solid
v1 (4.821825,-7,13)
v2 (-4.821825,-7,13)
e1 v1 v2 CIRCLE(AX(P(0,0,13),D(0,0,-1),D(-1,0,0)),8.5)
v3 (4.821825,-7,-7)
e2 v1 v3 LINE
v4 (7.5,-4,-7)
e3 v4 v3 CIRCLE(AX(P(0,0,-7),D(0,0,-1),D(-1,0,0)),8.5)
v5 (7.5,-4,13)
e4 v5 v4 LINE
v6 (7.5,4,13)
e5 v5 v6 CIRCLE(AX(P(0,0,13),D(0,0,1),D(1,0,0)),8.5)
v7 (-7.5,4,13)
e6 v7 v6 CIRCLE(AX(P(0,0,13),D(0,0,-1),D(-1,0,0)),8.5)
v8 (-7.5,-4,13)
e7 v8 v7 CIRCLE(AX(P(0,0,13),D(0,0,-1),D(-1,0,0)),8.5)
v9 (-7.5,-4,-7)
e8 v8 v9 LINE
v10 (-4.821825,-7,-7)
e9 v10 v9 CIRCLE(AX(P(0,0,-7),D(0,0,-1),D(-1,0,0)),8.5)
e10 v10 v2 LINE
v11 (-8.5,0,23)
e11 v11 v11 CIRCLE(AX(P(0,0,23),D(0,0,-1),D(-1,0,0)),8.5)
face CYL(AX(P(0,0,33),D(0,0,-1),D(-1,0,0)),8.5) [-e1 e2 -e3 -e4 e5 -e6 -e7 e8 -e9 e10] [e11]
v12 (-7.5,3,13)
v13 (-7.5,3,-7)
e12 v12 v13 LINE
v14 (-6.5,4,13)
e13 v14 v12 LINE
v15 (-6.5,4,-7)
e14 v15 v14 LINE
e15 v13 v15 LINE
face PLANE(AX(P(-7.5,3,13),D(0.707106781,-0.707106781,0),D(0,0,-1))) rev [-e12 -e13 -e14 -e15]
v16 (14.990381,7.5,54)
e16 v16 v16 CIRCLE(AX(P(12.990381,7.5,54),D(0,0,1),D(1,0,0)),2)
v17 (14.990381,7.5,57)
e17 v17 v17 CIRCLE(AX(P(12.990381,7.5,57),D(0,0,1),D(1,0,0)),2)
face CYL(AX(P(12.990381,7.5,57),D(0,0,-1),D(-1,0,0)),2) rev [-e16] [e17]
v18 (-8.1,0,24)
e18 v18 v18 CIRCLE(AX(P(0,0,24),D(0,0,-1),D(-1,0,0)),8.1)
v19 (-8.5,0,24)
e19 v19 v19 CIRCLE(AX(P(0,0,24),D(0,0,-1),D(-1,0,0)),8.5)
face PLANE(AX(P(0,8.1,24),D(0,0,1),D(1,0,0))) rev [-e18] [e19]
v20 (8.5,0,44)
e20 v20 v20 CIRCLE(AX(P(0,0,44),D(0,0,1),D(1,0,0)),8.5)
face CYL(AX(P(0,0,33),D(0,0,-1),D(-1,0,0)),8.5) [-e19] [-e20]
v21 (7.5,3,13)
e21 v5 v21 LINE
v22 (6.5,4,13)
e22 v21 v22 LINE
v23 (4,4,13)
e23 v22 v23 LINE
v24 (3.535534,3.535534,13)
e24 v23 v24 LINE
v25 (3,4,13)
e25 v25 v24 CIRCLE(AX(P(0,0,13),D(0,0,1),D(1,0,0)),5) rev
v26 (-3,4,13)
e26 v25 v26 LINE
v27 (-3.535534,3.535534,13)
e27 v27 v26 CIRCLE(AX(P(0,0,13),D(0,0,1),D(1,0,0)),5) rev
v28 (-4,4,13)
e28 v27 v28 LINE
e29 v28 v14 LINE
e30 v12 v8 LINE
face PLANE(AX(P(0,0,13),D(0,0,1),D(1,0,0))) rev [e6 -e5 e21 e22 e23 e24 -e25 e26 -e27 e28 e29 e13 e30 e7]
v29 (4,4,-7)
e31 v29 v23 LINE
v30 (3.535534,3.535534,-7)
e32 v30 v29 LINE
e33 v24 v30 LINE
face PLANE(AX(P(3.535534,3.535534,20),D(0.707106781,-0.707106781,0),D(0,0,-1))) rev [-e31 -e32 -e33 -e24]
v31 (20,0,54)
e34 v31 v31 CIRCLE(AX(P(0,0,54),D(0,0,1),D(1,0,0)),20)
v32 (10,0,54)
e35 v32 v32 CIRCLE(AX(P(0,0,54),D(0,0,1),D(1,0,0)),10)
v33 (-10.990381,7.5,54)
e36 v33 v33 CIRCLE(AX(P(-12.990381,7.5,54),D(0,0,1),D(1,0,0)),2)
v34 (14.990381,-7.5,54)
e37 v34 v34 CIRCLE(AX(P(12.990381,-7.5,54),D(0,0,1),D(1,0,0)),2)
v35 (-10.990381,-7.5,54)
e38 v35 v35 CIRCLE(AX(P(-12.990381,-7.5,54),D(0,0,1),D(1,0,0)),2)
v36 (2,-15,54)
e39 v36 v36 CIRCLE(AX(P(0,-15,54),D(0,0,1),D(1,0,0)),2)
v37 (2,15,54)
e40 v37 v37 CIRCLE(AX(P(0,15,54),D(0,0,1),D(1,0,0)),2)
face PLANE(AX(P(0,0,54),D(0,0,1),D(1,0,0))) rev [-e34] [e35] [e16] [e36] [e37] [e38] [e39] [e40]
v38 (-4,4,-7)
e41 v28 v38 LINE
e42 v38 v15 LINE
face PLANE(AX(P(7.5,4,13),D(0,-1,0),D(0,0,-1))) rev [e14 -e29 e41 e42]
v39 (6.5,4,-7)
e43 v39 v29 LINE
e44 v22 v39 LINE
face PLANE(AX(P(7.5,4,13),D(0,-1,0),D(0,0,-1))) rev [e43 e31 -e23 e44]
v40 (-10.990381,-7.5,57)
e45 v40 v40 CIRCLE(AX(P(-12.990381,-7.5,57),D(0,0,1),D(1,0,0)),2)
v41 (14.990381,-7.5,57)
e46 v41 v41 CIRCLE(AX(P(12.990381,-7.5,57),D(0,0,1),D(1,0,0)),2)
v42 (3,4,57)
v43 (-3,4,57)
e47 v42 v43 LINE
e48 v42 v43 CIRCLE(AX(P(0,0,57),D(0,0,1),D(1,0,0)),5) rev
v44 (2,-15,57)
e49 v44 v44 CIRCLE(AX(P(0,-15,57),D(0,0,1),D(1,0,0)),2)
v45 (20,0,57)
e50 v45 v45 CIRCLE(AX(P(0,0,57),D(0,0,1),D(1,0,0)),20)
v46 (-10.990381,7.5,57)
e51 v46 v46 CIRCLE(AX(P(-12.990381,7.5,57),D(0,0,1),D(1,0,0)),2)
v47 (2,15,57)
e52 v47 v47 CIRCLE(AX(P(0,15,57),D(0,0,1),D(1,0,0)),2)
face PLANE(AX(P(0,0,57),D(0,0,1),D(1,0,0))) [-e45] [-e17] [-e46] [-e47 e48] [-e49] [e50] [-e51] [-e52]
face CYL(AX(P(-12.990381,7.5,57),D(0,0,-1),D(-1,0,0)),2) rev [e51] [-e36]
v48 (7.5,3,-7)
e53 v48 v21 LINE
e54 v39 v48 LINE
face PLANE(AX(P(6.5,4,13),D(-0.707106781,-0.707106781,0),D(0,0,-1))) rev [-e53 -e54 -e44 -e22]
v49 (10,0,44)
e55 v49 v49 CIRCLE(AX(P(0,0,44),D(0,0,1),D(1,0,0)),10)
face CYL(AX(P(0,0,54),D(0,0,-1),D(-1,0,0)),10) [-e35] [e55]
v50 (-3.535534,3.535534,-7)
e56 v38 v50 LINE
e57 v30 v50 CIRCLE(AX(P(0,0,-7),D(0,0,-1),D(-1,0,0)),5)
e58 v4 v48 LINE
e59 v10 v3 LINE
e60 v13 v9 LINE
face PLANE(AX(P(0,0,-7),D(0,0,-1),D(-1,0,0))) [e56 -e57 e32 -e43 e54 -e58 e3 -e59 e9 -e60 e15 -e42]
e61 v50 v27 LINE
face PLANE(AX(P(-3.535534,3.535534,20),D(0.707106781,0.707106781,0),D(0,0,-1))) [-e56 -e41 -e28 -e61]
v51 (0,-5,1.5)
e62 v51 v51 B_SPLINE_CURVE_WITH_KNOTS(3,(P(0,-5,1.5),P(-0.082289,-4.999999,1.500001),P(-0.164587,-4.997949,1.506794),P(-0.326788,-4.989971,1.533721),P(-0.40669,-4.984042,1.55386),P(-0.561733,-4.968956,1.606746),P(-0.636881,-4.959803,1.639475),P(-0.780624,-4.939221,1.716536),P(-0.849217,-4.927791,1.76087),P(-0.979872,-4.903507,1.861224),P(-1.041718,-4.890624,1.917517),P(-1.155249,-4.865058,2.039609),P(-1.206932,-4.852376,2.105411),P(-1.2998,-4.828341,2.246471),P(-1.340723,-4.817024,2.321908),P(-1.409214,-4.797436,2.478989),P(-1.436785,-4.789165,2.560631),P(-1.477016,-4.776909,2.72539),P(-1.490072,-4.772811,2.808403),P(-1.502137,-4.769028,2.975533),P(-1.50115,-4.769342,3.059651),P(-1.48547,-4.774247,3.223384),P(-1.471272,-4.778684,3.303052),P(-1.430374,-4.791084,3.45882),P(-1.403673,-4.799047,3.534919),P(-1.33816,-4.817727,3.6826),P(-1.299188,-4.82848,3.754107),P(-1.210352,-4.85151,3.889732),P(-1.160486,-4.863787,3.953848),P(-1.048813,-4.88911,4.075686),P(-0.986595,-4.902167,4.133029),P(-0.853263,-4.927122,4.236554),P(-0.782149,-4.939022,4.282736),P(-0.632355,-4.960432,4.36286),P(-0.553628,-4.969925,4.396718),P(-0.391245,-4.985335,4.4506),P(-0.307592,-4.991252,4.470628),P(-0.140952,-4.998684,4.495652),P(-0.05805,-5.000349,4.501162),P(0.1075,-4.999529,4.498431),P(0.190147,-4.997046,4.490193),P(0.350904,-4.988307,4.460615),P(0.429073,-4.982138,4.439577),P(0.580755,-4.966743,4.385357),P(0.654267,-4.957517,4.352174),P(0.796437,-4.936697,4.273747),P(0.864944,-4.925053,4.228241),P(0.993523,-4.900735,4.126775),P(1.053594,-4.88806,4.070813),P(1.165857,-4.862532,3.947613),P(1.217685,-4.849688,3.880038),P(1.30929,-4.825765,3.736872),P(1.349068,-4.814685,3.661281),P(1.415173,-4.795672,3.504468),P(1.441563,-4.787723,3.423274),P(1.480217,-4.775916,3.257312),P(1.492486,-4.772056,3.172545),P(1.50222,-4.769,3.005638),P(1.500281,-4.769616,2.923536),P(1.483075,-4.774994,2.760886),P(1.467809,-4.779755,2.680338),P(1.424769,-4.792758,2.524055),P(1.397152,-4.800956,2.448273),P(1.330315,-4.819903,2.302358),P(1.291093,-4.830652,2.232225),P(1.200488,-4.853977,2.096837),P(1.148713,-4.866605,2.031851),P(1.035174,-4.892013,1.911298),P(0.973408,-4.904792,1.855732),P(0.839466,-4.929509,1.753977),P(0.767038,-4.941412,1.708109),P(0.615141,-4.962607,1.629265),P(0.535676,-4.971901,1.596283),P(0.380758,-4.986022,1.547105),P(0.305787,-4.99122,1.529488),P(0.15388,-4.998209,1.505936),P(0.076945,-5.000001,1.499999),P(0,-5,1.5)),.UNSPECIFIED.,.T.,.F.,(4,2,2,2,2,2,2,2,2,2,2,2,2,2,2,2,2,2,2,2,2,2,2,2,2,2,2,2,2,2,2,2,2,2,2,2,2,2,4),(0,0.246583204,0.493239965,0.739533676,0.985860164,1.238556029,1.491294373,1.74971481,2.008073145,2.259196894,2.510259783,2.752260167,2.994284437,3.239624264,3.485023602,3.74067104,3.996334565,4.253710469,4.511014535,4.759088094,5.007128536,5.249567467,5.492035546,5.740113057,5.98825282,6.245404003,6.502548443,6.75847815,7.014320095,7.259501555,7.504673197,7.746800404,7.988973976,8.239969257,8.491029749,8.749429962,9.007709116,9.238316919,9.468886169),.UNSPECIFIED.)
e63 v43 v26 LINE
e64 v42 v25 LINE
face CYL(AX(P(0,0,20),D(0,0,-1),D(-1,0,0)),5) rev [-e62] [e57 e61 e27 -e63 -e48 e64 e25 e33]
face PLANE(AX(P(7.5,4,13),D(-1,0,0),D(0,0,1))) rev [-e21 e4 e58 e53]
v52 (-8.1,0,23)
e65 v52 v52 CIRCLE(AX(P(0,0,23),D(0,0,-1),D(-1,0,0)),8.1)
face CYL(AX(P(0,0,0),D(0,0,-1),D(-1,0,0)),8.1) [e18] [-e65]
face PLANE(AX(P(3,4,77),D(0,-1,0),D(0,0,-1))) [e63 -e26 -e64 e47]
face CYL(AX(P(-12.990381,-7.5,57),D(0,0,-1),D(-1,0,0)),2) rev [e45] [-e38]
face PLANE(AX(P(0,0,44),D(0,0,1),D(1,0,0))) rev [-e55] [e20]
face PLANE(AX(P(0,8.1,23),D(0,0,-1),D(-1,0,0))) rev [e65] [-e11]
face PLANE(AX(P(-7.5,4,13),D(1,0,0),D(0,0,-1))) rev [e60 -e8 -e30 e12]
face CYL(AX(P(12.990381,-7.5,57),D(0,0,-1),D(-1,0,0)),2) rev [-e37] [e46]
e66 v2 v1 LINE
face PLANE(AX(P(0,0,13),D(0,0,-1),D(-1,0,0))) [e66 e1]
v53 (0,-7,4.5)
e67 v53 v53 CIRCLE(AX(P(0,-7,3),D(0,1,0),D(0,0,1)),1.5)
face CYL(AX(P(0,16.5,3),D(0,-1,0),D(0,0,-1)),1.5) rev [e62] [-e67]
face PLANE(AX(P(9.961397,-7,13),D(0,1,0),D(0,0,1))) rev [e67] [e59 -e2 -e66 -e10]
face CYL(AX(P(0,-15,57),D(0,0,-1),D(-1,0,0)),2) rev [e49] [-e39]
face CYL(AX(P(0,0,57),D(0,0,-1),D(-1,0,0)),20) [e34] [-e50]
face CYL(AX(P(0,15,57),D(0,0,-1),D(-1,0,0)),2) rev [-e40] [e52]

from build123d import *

# Parameters (mm, degrees)
SKETCH_1_R               = 8.5
EXTRUDE_1_DEPTH          = 33
SKETCH_2_R               = 8.5
EXTRUDE_2_DEPTH          = 11
SKETCH_3_R               = 10
EXTRUDE_3_DEPTH          = 10
CHAMFER_2_SIZE           = 0.5
SKETCH_12_W              = 1
SKETCH_12_H              = 0.4
SKETCH_13_R              = 5
CUT_EXTRUDE_1_DEPTH      = 20
EXTRUDE_START            = 7.5
SKETCH_19_R              = 8.5
EXTRUDE_6_DEPTH          = 7.5
SKETCH_20_R              = 5
CUT_EXTRUDE_5_DEPTH      = 7.5
CUT_EXTRUDE_6_DEPTH      = 16.5
CUT_EXTRUDE_6_DEPTH_BACK = 16.5
SKETCH_21_R              = 1.5
SKETCH_14_R              = 20
SKETCH_14_R_2            = 2
EXTRUDE_7_DEPTH          = 3
EXTRUDE_START_2          = 7
SKETCH_23_R              = 5
EXTRUDE_8_DEPTH          = 7
CUT_EXTRUDE_START        = -44
SKETCH_24_R              = 5
CUT_EXTRUDE_7_DEPTH      = 44
SKETCH_31_R              = 7
SKETCH_31_R_2            = 5
EXTRUDE_10_DEPTH         = 20
EXTRUDE_11_DEPTH         = 84
SKETCH_33_R              = 1.5
CUT_EXTRUDE_8_DEPTH      = 26
EXTRUDE_START_3          = -3
SKETCH_35_R              = 13
SKETCH_35_R_2            = 7
EXTRUDE_12_DEPTH         = 3
SKETCH_36_R              = 1.5
CUT_EXTRUDE_10_DEPTH     = 3
CUT_EXTRUDE_START_2      = -20
SKETCH_38_R              = 20
CUT_EXTRUDE_12_DEPTH     = 20
SKETCH_39_W              = 15
SKETCH_39_H              = 6.010679791
CUT_EXTRUDE_13_DEPTH     = 20
SKETCH_40_W              = 3.690554248
SKETCH_40_H              = 8
SKETCH_40_W_2            = 3.213479815
CUT_EXTRUDE_14_DEPTH     = 20
SKETCH_42_W              = 19.43068456
SKETCH_42_H              = 3.441553847
CUT_EXTRUDE_16_DEPTH     = 20
CHAMFER_5_SIZE           = 1
CHAMFER_6_SIZE           = 1


with BuildPart() as part:
    # 草图1 → 凸台-拉伸1 (new body)
    with BuildSketch(Plane.XY):
        Circle(SKETCH_1_R)
    extrude(amount=EXTRUDE_1_DEPTH)

    # 草图2 → 凸台-拉伸2 (add)
    with BuildSketch(Plane.XY.offset(33)):
        Circle(SKETCH_2_R)
    extrude(amount=EXTRUDE_2_DEPTH)

    # 草图3 → 凸台-拉伸3 (add)
    with BuildSketch(Plane.XY.offset(44)):
        Circle(SKETCH_3_R)
    extrude(amount=EXTRUDE_3_DEPTH)

    # 倒角2
    chamfer_2_edges = [part.edges().sort_by_distance(p)[0] for p in [
        (-8.5, 0, 0),
    ]]
    chamfer(chamfer_2_edges, length=CHAMFER_2_SIZE)

    # 草图12 → 切除-旋转1 (revolve, cut)
    with BuildSketch(Plane(origin=(0, 0, 0), x_dir=(0, 0, -1), z_dir=(1, 0, 0)), mode=Mode.PRIVATE) as cut_revolve_1_sk:
        with Locations((-23.5, 8.3)):
            Rectangle(SKETCH_12_W, SKETCH_12_H)
    revolve(cut_revolve_1_sk.sketch.rotate(Axis((0, 0, 0), (0, 0, 1)), 90), axis=Axis((0, 0, 0), (0, 0, 1)), mode=Mode.SUBTRACT)

    # 草图13 → 切除-拉伸1 (cut)
    with BuildSketch(Plane(origin=(0, 0, 0), x_dir=(-1, 0, 0), z_dir=(0, 0, -1))):
        Circle(SKETCH_13_R)
    extrude(amount=-CUT_EXTRUDE_1_DEPTH, mode=Mode.SUBTRACT)

    # 草图19 → 凸台-拉伸6 (add)
    with BuildSketch(Plane(origin=(0, 0, 0.5), x_dir=(-1, 0, 0), z_dir=(0, 0, -1)).offset(EXTRUDE_START)):
        Circle(SKETCH_19_R)
    extrude(amount=-EXTRUDE_6_DEPTH)

    # 草图20 → 切除-拉伸5 (cut)
    with BuildSketch(Plane(origin=(0, 0, -7), x_dir=(-1, 0, 0), z_dir=(0, 0, -1))):
        Circle(SKETCH_20_R)
    extrude(amount=-CUT_EXTRUDE_5_DEPTH, mode=Mode.SUBTRACT)

    # 草图21 → 切除-拉伸6 (cut, two sides: drawn at the far end of the back side and taken through both)
    with BuildSketch(Plane(origin=(0, 0, 0), x_dir=(1, 0, 0), z_dir=(0, 1, 0)).offset(-CUT_EXTRUDE_6_DEPTH_BACK)):
        with Locations(Location((0, -3, 0), (0, 0, 90))):
            Circle(SKETCH_21_R)
    extrude(amount=CUT_EXTRUDE_6_DEPTH + CUT_EXTRUDE_6_DEPTH_BACK, mode=Mode.SUBTRACT)

    # 草图14 → 凸台-拉伸7 (add)
    with BuildSketch(Plane.XY.offset(54)):
        Circle(SKETCH_14_R)
        with Locations((0, 15)):
            Circle(SKETCH_14_R_2, mode=Mode.SUBTRACT)
        with Locations((12.990381057, 7.5)):
            Circle(SKETCH_14_R_2, mode=Mode.SUBTRACT)
        with Locations((12.990381057, -7.5)):
            Circle(SKETCH_14_R_2, mode=Mode.SUBTRACT)
        with Locations((0, -15)):
            Circle(SKETCH_14_R_2, mode=Mode.SUBTRACT)
        with Locations((-12.990381057, -7.5)):
            Circle(SKETCH_14_R_2, mode=Mode.SUBTRACT)
        with Locations((-12.990381057, 7.5)):
            Circle(SKETCH_14_R_2, mode=Mode.SUBTRACT)
    extrude(amount=EXTRUDE_7_DEPTH)

    # 草图23 → 凸台-拉伸8 (add)
    with BuildSketch(Plane(origin=(0, 0, 20), x_dir=(-1, 0, 0), z_dir=(0, 0, -1)).offset(EXTRUDE_START_2)):
        Circle(SKETCH_23_R)
    extrude(amount=-EXTRUDE_8_DEPTH)

    # 草图24 → 切除-拉伸7 (cut)
    with BuildSketch(Plane.XY.offset(57).offset(CUT_EXTRUDE_START)):
        with Locations(Location((0, 0, 0), (0, 0, 180))):
            Circle(SKETCH_24_R)
    extrude(amount=CUT_EXTRUDE_7_DEPTH, mode=Mode.SUBTRACT)

    # 草图31 → 凸台-拉伸10 (add)
    with BuildSketch(Plane.XY.offset(57)):
        Circle(SKETCH_31_R)
        with Locations(Location((0, 0, 0), (0, 0, 180))):
            Circle(SKETCH_31_R_2, mode=Mode.SUBTRACT)
    extrude(amount=EXTRUDE_10_DEPTH)

    # 草图32 → 凸台-拉伸11 (add)
    with BuildSketch(Plane(origin=(0, 0, -7), x_dir=(-1, 0, 0), z_dir=(0, 0, -1))):
        with BuildLine():
            Line((-3, 4), (3, 4))
            ThreePointArc((3, 4), (0, 5), (-3, 4))
        make_face()
    extrude(amount=-EXTRUDE_11_DEPTH)

    # 草图33 → 切除-拉伸8 (cut)
    with BuildSketch(Plane.XZ.offset(-4)):
        with Locations(Location((0, 3, 0), (0, 0, 270))):
            Circle(SKETCH_33_R)
    extrude(amount=-CUT_EXTRUDE_8_DEPTH, mode=Mode.SUBTRACT)

    # 草图35 → 凸台-拉伸12 (add)
    with BuildSketch(Plane.XY.offset(74).offset(EXTRUDE_START_3)):
        Circle(SKETCH_35_R)
        Circle(SKETCH_35_R_2, mode=Mode.SUBTRACT)
    extrude(amount=EXTRUDE_12_DEPTH)

    # 草图36 → 切除-拉伸10 (cut)
    with BuildSketch(Plane.XY.offset(74)):
        with Locations((0, 10)):
            Circle(SKETCH_36_R)
        with Locations((8.660254038, 5)):
            Circle(SKETCH_36_R)
        with Locations((8.660254038, -5)):
            Circle(SKETCH_36_R)
        with Locations((0, -10)):
            Circle(SKETCH_36_R)
        with Locations((-8.660254038, -5)):
            Circle(SKETCH_36_R)
        with Locations((-8.660254038, 5)):
            Circle(SKETCH_36_R)
    extrude(amount=-CUT_EXTRUDE_10_DEPTH, mode=Mode.SUBTRACT)

    # 草图38 → 切除-拉伸12 (cut)
    with BuildSketch(Plane.XY.offset(77).offset(CUT_EXTRUDE_START_2)):
        Circle(SKETCH_38_R)
    extrude(amount=CUT_EXTRUDE_12_DEPTH, mode=Mode.SUBTRACT)

    # 草图39 → 切除-拉伸13 (cut)
    with BuildSketch(Plane(origin=(0, 0, -7), x_dir=(-1, 0, 0), z_dir=(0, 0, -1))):
        with Locations((0, 7.005339896)):
            Rectangle(SKETCH_39_W, SKETCH_39_H)
    extrude(amount=-CUT_EXTRUDE_13_DEPTH, mode=Mode.SUBTRACT)

    # 草图40 → 切除-拉伸14 (cut)
    with BuildSketch(Plane(origin=(0, 0, -7), x_dir=(-1, 0, 0), z_dir=(0, 0, -1))):
        with Locations((-9.345277124, 0)):
            Rectangle(SKETCH_40_W, SKETCH_40_H)
        with Locations((9.106739908, 0)):
            Rectangle(SKETCH_40_W_2, SKETCH_40_H)
    extrude(amount=-CUT_EXTRUDE_14_DEPTH, mode=Mode.SUBTRACT)

    # 草图42 → 切除-拉伸16 (cut)
    with BuildSketch(Plane(origin=(0, 0, -7), x_dir=(-1, 0, 0), z_dir=(0, 0, -1))):
        with Locations((-0.246054433, -8.720776924)):
            Rectangle(SKETCH_42_W, SKETCH_42_H)
    extrude(amount=-CUT_EXTRUDE_16_DEPTH, mode=Mode.SUBTRACT)

    # 倒角5
    chamfer_5_edges = [part.edges().sort_by_distance(p)[0] for p in [
        (-7.5, 4, 3),
        (7.5, 4, 3),
    ]]
    chamfer(chamfer_5_edges, length=CHAMFER_5_SIZE)

    # 倒角6
    # the kernel refuses this chamfer: 1, 0.714285714 mm, written as the material it takes off along each edge
    with BuildSketch(Plane(origin=(-3, 4, -9.571682988), x_dir=(-1, 0, 0), z_dir=(0, 0, 1)), Plane(origin=(3, 4, 13), x_dir=(1, 0, 0), z_dir=(0, 0, -1))) as chamfer_6_piece_1:
        with BuildLine():
            Line((CHAMFER_6_SIZE, 0), (0.535533906, 0.464466094))
            ThreePointArc((0.535533906, 0.464466094), (0.274930492, 0.221795364), (0, 0))
            Line((0, 0), (CHAMFER_6_SIZE, 0))
        make_face()
    extrude(amount=22.571682988, mode=Mode.SUBTRACT)


solid = part.part
